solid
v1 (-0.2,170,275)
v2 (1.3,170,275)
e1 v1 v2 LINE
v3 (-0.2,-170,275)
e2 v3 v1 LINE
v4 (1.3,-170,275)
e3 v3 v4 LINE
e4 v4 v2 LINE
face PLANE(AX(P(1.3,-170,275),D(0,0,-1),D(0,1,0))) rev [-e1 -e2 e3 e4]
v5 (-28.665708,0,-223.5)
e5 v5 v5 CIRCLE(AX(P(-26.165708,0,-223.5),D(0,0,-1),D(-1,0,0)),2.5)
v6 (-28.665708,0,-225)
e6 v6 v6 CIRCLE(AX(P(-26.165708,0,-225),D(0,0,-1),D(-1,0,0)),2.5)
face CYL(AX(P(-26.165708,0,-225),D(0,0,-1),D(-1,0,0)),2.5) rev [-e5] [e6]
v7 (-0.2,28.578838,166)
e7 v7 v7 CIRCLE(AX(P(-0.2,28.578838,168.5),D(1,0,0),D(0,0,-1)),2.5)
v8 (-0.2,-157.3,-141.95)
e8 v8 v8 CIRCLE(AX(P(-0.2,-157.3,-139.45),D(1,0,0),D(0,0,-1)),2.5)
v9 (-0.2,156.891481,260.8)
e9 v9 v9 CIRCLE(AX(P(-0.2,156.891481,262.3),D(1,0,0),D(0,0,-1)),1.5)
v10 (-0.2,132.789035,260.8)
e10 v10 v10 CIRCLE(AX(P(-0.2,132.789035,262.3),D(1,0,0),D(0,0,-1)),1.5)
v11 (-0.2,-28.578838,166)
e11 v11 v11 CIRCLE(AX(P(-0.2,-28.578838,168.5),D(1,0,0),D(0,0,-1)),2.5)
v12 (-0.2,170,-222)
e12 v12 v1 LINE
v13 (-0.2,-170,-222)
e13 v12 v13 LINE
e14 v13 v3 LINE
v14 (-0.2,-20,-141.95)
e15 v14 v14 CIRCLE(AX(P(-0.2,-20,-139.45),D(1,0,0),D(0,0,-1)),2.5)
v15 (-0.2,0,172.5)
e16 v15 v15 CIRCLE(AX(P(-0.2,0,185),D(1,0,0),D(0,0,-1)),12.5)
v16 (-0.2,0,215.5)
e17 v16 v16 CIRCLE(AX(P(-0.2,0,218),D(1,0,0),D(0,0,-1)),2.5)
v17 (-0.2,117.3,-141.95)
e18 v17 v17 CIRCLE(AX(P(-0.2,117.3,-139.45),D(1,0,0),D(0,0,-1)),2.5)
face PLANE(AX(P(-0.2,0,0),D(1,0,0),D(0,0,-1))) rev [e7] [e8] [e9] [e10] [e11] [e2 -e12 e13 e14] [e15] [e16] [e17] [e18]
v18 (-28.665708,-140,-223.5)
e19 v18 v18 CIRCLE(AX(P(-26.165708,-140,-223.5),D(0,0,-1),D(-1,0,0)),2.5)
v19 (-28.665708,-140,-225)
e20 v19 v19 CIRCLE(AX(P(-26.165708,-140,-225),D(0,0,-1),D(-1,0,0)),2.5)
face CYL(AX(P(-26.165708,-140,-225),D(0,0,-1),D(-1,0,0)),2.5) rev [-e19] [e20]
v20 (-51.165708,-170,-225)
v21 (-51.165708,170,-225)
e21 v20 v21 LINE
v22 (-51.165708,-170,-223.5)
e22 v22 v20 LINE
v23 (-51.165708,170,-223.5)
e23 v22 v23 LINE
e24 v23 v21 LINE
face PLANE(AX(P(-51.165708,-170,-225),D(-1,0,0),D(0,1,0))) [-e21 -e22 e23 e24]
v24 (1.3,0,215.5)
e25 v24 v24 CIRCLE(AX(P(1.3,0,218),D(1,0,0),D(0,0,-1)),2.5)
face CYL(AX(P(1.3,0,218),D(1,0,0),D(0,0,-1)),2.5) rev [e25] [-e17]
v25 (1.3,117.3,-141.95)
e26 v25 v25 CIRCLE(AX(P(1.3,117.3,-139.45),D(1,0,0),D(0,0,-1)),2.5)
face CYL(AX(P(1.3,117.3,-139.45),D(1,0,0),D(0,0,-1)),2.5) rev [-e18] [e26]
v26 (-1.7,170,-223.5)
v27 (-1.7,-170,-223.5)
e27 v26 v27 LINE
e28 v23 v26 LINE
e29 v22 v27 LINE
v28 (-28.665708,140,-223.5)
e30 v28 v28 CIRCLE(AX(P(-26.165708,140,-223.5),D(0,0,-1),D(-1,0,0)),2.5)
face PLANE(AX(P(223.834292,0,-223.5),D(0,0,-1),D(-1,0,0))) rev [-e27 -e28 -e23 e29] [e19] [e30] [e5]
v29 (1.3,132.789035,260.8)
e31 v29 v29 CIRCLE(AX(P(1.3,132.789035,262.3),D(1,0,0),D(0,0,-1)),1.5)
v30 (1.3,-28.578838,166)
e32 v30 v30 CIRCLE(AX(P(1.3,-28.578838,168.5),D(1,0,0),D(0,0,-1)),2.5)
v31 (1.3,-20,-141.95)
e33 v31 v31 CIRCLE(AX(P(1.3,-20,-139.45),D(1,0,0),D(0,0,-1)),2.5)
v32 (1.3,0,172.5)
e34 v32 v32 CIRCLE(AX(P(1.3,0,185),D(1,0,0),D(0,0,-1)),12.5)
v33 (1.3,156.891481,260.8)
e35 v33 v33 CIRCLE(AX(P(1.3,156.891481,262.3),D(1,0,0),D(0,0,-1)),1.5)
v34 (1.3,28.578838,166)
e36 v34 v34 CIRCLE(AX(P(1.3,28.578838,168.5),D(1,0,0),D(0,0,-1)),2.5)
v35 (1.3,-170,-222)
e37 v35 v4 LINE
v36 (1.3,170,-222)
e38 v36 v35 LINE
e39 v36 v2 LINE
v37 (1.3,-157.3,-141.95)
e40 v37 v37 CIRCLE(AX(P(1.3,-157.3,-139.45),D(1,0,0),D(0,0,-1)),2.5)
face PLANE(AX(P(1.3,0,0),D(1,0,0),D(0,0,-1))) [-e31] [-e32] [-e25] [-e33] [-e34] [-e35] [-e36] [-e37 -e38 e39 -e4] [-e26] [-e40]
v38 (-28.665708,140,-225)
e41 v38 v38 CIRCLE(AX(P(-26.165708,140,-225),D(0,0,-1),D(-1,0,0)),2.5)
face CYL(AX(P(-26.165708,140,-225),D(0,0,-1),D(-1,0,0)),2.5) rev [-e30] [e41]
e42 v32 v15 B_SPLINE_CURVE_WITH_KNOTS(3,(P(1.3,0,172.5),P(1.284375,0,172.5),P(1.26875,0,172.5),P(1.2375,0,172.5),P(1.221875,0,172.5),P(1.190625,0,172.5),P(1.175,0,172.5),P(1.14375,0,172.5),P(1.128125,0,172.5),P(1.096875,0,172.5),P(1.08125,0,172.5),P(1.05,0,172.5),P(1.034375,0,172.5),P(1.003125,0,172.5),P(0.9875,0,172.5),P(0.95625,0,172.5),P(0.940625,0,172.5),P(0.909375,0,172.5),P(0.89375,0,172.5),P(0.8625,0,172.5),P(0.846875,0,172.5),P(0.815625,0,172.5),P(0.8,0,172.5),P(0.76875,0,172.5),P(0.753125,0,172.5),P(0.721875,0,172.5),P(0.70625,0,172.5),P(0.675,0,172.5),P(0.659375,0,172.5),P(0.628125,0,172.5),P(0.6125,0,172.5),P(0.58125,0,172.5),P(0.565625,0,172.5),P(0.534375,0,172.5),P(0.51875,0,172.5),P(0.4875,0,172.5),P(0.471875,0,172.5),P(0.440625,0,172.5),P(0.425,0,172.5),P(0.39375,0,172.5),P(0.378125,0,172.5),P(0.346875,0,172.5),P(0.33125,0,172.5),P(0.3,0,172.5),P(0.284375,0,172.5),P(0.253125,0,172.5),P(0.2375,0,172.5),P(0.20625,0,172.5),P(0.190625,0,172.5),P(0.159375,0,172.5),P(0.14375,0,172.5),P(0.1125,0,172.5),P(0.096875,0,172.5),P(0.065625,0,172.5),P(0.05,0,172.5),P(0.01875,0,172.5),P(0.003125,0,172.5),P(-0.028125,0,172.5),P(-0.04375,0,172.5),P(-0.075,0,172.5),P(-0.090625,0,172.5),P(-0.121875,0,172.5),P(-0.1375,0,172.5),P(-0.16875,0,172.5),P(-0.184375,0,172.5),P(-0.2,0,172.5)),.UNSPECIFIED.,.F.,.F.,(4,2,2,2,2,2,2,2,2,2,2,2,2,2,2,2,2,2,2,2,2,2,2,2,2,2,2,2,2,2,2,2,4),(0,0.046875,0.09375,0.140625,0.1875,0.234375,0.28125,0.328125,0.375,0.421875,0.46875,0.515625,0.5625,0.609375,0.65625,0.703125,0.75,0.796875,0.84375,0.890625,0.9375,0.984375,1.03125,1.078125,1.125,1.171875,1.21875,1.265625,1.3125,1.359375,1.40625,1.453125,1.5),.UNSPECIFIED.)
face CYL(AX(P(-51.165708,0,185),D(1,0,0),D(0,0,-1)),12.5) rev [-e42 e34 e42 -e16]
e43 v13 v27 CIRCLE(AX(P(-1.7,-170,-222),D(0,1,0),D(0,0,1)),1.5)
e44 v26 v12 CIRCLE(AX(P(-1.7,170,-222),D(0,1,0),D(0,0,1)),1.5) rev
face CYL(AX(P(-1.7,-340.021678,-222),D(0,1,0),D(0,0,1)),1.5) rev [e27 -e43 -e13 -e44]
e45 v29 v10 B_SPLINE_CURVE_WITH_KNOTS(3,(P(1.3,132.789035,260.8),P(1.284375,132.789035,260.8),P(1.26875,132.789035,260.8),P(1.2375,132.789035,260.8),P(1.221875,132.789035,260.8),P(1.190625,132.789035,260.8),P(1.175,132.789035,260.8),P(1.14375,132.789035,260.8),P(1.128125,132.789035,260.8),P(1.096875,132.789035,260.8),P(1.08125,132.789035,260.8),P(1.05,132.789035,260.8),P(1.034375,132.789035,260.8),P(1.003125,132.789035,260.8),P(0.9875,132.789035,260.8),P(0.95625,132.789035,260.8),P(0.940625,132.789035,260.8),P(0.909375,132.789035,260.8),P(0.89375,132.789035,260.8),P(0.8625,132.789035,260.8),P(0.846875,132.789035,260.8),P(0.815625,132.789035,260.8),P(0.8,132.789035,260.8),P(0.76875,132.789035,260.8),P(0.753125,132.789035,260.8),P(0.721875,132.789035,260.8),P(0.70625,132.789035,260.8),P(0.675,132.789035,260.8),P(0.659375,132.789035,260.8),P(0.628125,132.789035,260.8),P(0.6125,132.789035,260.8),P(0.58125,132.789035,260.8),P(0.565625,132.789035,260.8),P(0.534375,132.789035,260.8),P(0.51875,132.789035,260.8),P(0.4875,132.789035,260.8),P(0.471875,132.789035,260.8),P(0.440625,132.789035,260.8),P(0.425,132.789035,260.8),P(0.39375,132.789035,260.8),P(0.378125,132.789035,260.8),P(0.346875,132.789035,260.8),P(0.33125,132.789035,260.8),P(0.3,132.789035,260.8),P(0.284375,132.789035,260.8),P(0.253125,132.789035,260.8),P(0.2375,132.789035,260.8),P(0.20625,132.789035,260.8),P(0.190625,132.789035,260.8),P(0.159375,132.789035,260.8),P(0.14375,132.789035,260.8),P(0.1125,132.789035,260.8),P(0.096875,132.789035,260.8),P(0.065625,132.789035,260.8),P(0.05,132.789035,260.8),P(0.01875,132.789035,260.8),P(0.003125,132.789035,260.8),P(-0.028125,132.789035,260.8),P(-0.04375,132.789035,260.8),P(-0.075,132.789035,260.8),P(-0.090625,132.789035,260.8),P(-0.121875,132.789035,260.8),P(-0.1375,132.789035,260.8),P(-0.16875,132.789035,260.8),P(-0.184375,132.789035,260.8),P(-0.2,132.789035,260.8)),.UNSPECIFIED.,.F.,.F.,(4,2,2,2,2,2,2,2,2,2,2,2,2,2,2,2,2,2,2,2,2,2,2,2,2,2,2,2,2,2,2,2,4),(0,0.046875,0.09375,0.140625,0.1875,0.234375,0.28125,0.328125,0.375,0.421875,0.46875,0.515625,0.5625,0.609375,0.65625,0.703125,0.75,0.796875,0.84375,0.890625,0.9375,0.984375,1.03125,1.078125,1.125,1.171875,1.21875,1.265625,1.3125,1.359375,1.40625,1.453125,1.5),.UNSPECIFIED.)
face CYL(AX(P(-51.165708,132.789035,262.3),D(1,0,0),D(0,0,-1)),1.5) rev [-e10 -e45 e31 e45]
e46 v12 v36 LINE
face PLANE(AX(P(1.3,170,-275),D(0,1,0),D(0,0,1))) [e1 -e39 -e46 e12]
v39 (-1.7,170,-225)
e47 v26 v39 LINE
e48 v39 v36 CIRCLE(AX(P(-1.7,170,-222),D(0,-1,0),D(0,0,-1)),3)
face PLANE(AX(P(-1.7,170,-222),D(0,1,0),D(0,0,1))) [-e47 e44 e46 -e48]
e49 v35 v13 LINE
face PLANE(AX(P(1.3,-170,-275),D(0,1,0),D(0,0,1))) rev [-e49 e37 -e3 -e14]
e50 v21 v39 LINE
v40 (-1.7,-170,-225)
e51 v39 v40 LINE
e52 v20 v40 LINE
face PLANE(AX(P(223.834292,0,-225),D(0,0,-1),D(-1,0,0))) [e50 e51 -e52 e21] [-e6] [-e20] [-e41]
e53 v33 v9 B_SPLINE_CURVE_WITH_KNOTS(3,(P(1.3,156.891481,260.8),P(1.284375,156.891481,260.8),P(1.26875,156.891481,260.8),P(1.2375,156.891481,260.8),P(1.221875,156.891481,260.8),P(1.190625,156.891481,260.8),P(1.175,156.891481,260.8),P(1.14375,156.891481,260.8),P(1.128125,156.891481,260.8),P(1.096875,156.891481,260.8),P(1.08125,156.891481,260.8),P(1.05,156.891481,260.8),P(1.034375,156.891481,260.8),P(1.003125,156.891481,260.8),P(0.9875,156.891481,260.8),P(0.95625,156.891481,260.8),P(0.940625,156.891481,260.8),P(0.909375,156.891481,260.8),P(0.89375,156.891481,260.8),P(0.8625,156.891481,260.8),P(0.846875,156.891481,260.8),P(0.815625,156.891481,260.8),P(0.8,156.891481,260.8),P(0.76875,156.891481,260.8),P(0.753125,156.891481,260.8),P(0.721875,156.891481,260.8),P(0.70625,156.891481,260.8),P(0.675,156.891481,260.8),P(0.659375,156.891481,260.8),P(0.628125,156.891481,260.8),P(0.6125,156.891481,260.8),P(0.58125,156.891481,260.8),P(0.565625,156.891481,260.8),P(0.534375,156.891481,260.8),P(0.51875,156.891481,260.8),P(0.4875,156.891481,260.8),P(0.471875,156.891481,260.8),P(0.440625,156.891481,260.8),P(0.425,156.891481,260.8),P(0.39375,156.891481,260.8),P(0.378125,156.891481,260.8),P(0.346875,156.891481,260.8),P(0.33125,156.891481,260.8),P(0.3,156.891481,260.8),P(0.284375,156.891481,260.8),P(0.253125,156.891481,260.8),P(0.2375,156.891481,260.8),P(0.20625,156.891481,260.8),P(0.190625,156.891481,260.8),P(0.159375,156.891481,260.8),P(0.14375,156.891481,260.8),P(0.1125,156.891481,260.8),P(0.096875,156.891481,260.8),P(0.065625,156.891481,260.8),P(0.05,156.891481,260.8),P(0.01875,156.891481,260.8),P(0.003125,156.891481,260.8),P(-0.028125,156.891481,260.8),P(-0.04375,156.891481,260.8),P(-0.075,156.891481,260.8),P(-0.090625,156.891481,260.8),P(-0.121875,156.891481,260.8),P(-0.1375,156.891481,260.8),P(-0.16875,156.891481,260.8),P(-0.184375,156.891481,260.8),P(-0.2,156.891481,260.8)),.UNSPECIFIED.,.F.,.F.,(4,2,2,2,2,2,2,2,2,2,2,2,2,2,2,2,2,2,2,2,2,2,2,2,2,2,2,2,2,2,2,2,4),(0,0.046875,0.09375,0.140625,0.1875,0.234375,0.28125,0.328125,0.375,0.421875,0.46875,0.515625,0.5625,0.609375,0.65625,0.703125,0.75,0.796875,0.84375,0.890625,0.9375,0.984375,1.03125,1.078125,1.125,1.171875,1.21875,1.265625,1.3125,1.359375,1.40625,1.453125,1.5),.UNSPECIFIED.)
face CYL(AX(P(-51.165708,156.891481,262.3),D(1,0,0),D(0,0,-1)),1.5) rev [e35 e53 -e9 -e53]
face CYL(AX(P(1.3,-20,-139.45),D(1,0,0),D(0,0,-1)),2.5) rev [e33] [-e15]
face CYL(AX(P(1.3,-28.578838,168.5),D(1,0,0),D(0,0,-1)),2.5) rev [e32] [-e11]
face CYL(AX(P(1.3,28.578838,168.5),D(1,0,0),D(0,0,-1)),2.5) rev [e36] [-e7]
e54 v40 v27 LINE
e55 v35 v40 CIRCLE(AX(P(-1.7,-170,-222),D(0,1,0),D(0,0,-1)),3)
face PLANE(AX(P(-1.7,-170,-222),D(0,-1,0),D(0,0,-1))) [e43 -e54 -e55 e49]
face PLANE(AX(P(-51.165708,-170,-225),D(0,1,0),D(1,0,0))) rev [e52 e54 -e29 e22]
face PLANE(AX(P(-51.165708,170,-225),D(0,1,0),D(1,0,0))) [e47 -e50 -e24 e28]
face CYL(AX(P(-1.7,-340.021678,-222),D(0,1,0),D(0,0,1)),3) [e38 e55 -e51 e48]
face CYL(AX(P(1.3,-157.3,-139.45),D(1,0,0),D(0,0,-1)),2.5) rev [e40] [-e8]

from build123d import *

# Parameters (mm, degrees)
SKETCH1_W                  = 340
SKETCH1_H                  = 550
BOSS_EXTRUDE1_DEPTH        = 1.3
F_5_0_5_DIAMETER_HOLE1_D   = 5
CONVERT_SOLID1_START       = -0.2
CONVERT_SOLID1_OUTLINE_W   = 340
CONVERT_SOLID1_OUTLINE_H   = 550
CONVERT_SOLID1_OUTLINE_R   = 2.5
CONVERT_SOLID1_DEPTH       = 0.2
SKETCHED_START             = -275
SKETCHED_BEND1_OUTLINE_W   = 1.5
SKETCHED_BEND1_OUTLINE_H   = 340
SKETCHED_BEND1_DEPTH       = 50.30822
SKETCHED_START_2           = -225
SKETCHED_BEND1_2_OUTLINE_W = 50.965708265
SKETCHED_BEND1_2_OUTLINE_H = 340
SKETCHED_BEND1_2_OUTLINE_R = 2.5
SKETCHED_BEND1_2_DEPTH     = 3
SKETCHED_START_3           = -171
SKETCHED_BEND1_3_DEPTH     = 342
F_5_0_5_DIAMETER_HOLE2_D   = 5
SKETCH10_2_R               = 12.5
CUT_EXTRUDE1_DEPTH         = 328.532670956
CUT_EXTRUDE3_DEPTH         = 328.32694619
CUT_EXTRUDE3_DEPTH_BACK    = 328.32694619
SKETCH1_4_R                = 1.5


with BuildPart() as part:
    # Sketch1 → Boss-Extrude1 (new body)
    with BuildSketch(Plane.YZ):
        Rectangle(SKETCH1_W, SKETCH1_H)
    extrude(amount=BOSS_EXTRUDE1_DEPTH)

    # Ø5.0 (5) Diameter Hole1 (through all)
    with Locations(Plane.YZ.offset(1.3)):
        with Locations((-157.3, -139.45), (-20, -139.45), (117.3, -139.45), (140, -250), (0, -250), (-140, -250)):
            Hole(F_5_0_5_DIAMETER_HOLE1_D / 2)

    # Convert-Solid1: read off the stored shape, not the designer's step
    # Convert-Solid1 outline → Convert-Solid1 (add)
    with BuildSketch(Plane.YZ.offset(CONVERT_SOLID1_START)):
        Rectangle(CONVERT_SOLID1_OUTLINE_W, CONVERT_SOLID1_OUTLINE_H)
        with Locations((-140, -250)):
            Circle(CONVERT_SOLID1_OUTLINE_R, mode=Mode.SUBTRACT)
        with Locations((-157.3, -139.45)):
            Circle(CONVERT_SOLID1_OUTLINE_R, mode=Mode.SUBTRACT)
        with Locations((-20, -139.45)):
            Circle(CONVERT_SOLID1_OUTLINE_R, mode=Mode.SUBTRACT)
        with Locations((0, -250)):
            Circle(CONVERT_SOLID1_OUTLINE_R, mode=Mode.SUBTRACT)
        with Locations((140, -250)):
            Circle(CONVERT_SOLID1_OUTLINE_R, mode=Mode.SUBTRACT)
        with Locations((117.3, -139.45)):
            Circle(CONVERT_SOLID1_OUTLINE_R, mode=Mode.SUBTRACT)
    extrude(amount=CONVERT_SOLID1_DEPTH)

    # Sketched Bend1: read off the stored shape, not the designer's step
    # Sketched Bend1 outline → Sketched Bend1 (cut)
    with BuildSketch(Plane.XY.offset(SKETCHED_START)):
        with Locations((0.55, 0)):
            Rectangle(SKETCHED_BEND1_OUTLINE_W, SKETCHED_BEND1_OUTLINE_H)
    extrude(amount=SKETCHED_BEND1_DEPTH, mode=Mode.SUBTRACT)

    # Sketched Bend1 2 outline → Sketched Bend1 2 (add)
    with BuildSketch(Plane.XY.offset(SKETCHED_START_2)):
        with Locations((-25.682854133, 0)):
            Rectangle(SKETCHED_BEND1_2_OUTLINE_W, SKETCHED_BEND1_2_OUTLINE_H)
        with Locations((-26.165708265, -140)):
            Circle(SKETCHED_BEND1_2_OUTLINE_R, mode=Mode.SUBTRACT)
        with Locations((-26.165708265, 0)):
            Circle(SKETCHED_BEND1_2_OUTLINE_R, mode=Mode.SUBTRACT)
        with Locations((-26.165708265, 140)):
            Circle(SKETCHED_BEND1_2_OUTLINE_R, mode=Mode.SUBTRACT)
    extrude(amount=SKETCHED_BEND1_2_DEPTH)

    # Sketched Bend1 3 outline → Sketched Bend1 3 (cut)
    with BuildSketch(Plane(origin=(0, 0, 0), x_dir=(1, 0, 0), z_dir=(0, 1, 0)).offset(SKETCHED_START_3)):
        with BuildLine():
            ThreePointArc((-0.2, 222), (-0.639339828, 223.060660172), (-1.7, 223.5))
            Line((-1.7, 223.5), (-51.165708265, 223.5))
            Line((-51.165708265, 223.5), (-51.165708265, 222))
            Line((-51.165708265, 222), (-0.2, 222))
        make_face()
        with BuildLine():
            Line((-0.2, 225), (-1.7, 225))
            ThreePointArc((-1.7, 225), (0.421320344, 224.121320344), (1.3, 222))
            Line((1.3, 222), (1.3, 224.69178))
            Line((1.3, 224.69178), (-0.2, 224.69178))
            Line((-0.2, 224.69178), (-0.2, 225))
        make_face()
    extrude(amount=SKETCHED_BEND1_3_DEPTH, mode=Mode.SUBTRACT)

    # Ø5.0 (5) Diameter Hole2 (through all)
    with Locations(Plane.YZ.offset(1.3)):
        with Locations((-28.578838325, 168.5), (0, 218), (28.578838325, 168.5)):
            Hole(F_5_0_5_DIAMETER_HOLE2_D / 2)

    # Sketch10<2> → Cut-Extrude1 (cut, through all)
    with BuildSketch(Plane.YZ.offset(1.3)):
        with Locations(Location((0, 185, 0), (0, 0, 270))):
            Circle(SKETCH10_2_R)
    extrude(amount=-CUT_EXTRUDE1_DEPTH, mode=Mode.SUBTRACT)

    # Sketch1<4> → Cut-Extrude3 (cut, two sides: drawn at the far end of the back side and taken through both)
    with BuildSketch(Plane.YZ.offset(-CUT_EXTRUDE3_DEPTH_BACK)):
        with Locations(Location((156.891480577, 262.3, 0), (0, 0, 270))):
            Circle(SKETCH1_4_R)
        with Locations(Location((132.789034574, 262.3, 0), (0, 0, 270))):
            Circle(SKETCH1_4_R)
    extrude(amount=CUT_EXTRUDE3_DEPTH + CUT_EXTRUDE3_DEPTH_BACK, mode=Mode.SUBTRACT)


solid = part.part
